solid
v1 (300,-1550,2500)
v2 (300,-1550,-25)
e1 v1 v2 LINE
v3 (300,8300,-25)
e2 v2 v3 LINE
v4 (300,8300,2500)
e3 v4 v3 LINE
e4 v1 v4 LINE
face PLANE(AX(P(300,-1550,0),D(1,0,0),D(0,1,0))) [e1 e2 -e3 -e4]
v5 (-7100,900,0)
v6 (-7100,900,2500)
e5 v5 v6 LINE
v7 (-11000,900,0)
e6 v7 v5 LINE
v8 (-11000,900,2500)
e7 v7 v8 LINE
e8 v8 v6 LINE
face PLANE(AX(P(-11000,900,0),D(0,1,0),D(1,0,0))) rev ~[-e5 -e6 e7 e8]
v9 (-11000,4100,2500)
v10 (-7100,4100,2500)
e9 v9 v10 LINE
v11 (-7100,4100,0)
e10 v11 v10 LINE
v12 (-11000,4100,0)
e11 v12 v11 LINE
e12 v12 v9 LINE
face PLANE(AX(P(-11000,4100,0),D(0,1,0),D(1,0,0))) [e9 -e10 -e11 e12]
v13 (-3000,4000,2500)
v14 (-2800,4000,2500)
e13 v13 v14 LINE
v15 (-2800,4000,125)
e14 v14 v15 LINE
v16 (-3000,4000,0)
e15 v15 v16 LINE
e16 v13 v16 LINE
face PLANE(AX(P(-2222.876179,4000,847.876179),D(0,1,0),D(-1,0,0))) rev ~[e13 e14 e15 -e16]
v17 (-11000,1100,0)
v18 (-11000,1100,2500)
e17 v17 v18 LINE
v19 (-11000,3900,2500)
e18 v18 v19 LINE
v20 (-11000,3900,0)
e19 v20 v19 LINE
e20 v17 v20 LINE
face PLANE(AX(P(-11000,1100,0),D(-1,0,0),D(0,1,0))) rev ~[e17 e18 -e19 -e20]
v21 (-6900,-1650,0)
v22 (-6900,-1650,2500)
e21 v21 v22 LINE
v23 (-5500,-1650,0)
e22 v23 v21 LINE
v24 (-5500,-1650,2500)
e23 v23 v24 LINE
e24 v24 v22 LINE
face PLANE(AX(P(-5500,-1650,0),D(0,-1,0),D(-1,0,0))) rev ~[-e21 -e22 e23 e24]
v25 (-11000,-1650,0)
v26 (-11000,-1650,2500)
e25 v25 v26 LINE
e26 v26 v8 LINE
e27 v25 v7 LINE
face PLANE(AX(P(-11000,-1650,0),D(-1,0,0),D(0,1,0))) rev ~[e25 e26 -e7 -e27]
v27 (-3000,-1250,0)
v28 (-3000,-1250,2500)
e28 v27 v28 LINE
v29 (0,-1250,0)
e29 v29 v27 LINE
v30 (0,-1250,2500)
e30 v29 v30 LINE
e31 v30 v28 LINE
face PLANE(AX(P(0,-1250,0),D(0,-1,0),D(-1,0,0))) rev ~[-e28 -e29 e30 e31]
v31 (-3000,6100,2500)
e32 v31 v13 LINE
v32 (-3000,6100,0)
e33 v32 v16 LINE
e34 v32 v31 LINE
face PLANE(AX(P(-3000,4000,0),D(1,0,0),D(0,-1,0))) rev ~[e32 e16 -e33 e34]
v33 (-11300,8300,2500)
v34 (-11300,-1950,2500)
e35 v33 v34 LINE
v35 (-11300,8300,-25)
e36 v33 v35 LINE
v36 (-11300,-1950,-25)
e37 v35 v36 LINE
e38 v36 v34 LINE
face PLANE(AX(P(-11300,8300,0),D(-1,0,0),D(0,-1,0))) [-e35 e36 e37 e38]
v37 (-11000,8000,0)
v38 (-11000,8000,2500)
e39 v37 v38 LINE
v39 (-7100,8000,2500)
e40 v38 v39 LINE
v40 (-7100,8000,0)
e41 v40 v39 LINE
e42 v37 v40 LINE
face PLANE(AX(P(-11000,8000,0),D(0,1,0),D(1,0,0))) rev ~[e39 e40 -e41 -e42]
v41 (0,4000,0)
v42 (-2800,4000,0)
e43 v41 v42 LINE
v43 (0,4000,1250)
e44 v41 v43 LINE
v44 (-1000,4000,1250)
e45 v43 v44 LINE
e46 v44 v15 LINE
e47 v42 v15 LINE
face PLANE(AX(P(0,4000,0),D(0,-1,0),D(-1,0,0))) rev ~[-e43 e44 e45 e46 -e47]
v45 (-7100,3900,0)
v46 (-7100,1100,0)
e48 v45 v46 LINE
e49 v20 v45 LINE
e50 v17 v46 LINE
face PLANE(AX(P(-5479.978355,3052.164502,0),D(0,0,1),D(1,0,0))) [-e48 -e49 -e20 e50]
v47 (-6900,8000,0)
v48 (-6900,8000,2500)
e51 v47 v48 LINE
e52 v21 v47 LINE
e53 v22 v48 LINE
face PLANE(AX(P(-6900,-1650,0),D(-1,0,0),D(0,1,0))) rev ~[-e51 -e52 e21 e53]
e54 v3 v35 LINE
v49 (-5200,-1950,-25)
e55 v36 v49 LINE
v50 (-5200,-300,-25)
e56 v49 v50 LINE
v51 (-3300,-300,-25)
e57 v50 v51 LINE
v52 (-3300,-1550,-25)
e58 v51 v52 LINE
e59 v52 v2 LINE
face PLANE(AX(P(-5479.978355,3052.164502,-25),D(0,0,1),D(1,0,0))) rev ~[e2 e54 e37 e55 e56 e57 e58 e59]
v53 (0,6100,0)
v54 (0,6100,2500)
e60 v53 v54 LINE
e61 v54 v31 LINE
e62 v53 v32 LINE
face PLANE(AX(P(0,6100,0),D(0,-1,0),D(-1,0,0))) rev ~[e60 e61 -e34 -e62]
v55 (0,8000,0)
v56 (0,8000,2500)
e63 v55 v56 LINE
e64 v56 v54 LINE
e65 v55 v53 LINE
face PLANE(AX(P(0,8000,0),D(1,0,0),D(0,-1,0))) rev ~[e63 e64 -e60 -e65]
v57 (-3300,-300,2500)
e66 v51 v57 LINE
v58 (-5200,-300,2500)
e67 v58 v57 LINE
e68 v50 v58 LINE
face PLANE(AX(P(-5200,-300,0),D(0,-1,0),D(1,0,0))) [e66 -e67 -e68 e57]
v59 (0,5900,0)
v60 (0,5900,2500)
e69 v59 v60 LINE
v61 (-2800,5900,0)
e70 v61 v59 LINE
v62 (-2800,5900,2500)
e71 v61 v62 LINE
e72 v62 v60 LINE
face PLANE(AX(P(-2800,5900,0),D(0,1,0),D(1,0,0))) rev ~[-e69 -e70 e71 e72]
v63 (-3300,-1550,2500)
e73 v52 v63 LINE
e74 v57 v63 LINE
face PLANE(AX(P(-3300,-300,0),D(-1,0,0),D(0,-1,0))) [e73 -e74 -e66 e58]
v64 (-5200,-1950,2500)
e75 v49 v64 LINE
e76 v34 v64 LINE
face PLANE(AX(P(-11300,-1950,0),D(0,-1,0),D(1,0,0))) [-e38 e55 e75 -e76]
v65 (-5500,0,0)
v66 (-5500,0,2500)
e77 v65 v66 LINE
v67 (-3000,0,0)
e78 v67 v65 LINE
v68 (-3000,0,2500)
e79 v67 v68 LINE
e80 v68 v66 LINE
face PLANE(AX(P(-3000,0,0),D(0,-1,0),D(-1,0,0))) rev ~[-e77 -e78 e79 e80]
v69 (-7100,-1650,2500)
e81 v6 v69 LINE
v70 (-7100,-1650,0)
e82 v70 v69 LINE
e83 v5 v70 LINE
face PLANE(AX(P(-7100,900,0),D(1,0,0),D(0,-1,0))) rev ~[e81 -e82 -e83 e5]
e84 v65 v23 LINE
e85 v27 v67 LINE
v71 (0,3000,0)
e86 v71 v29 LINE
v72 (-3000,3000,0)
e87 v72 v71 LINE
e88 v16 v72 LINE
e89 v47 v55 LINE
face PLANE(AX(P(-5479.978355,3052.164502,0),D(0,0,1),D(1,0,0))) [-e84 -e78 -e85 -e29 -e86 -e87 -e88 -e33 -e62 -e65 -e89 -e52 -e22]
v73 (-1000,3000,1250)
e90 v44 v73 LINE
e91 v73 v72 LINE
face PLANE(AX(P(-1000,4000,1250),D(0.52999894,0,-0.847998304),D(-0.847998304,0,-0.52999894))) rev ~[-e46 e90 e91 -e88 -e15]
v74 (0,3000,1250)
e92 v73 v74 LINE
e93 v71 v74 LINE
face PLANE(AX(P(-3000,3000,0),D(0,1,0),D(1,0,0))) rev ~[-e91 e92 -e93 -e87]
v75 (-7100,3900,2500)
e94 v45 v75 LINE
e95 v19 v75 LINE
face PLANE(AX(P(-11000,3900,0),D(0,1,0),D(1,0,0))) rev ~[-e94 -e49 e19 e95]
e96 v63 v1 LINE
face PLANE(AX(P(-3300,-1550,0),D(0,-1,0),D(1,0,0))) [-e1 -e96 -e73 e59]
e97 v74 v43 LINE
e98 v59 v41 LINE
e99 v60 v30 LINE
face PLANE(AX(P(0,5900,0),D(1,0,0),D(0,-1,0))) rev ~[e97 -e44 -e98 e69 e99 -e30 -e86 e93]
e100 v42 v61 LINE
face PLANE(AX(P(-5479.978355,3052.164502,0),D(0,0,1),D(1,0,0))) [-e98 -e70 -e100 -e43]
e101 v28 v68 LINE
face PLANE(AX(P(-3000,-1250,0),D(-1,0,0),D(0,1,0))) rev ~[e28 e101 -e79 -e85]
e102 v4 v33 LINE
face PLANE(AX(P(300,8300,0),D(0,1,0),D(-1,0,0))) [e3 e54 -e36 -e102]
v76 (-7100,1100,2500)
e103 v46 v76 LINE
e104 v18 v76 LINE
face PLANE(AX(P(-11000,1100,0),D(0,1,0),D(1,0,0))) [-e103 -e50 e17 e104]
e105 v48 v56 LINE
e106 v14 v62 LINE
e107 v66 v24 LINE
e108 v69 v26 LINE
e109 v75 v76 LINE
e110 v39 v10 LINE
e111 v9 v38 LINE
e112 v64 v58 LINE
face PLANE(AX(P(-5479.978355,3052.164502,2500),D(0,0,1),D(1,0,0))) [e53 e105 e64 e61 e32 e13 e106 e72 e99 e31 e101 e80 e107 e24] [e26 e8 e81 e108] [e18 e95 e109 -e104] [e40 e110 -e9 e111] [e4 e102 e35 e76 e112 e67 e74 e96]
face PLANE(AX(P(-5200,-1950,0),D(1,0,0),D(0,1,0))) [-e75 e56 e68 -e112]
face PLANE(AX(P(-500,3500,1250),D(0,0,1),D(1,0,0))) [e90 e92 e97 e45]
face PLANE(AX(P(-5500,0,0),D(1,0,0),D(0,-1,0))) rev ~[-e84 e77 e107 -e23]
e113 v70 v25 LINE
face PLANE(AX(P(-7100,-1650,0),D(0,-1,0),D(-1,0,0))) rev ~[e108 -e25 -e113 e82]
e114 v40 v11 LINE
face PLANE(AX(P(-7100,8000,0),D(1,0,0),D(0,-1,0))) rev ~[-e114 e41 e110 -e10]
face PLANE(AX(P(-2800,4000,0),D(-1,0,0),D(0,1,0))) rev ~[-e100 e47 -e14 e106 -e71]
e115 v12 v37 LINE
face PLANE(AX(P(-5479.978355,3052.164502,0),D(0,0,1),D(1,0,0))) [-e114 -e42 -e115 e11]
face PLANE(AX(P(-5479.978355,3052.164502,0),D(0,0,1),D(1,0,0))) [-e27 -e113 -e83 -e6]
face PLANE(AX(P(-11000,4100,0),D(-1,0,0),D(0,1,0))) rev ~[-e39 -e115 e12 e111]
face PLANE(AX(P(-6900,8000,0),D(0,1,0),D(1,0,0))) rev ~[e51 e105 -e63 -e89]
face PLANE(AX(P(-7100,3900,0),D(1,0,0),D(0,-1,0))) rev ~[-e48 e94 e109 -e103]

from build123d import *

# Parameters (mm, degrees)
F0_W        = 3900
F0_H        = 200
F1_DEPTH    = 2500
F0_H_2      = 3900
F0_H_3      = 2800
F2_DEPTH    = 25
F3_W        = 1000
F3_H        = 1000
F4_DEPTH    = 1250
F5_T4_DEPTH = 6170.686280177


# Not quite as in the source:
# - a fillet or chamfer that OpenCascade refuses, or shapes differently, is made with other operations: its cross-section is extruded or revolved along the edge and cut away or added


with BuildPart() as f1:
    # F0 (on Top) → F1 (new body)
    with BuildSketch(Plane.XY):
        Polygon((-11300, 8300), (-11300, 2877.939863491), (-11300, -1950), (-5200, -1950), (-5200, -300), (-3300, -300), (-3300, -1550), (300, -1550), (300, 2832.2768892759), (300, 8300), align=None)
        Polygon((-3000, -1250), (-3000, 0), (-5500, 0), (-5500, -1650), (-6900, -1650), (-7100, -1650), (-11000, -1650), (-11000, 0), (-11000, 900), (-11000, 1100), (-11000, 3900), (-11000, 4100), (-11000, 8000), (-7100, 8000), (-6900, 8000), (0, 8000), (0, 6100), (0, 5900), (0, 0), (0, -1250), align=None, mode=Mode.SUBTRACT)
        Polygon((-7100, -1650), (-6900, -1650), (-6900, 8000), (-7100, 8000), (-7100, 4100), (-7100, 3900), (-7100, 1100), (-7100, 900), align=None)
        with Locations((-9050, 4000)):
            Rectangle(F0_W, F0_H)
        with Locations((-9050, 1000)):
            Rectangle(F0_W, F0_H)
        Polygon((-2800, 5900), (0, 5900), (0, 6100), (-3000, 6100), (-3000, 4000), (-2800, 4000), align=None)
    extrude(amount=F1_DEPTH)

    # F0 (on Top) → F2 (join)
    with BuildSketch(Plane.XY):
        Polygon((-11300, 8300), (-11300, 2877.939863491), (-11300, -1950), (-5200, -1950), (-5200, -300), (-3300, -300), (-3300, -1550), (300, -1550), (300, 2832.2768892759), (300, 8300), align=None)
        Polygon((-3000, -1250), (-3000, 0), (-5500, 0), (-5500, -1650), (-6900, -1650), (-7100, -1650), (-11000, -1650), (-11000, 0), (-11000, 900), (-11000, 1100), (-11000, 3900), (-11000, 4100), (-11000, 8000), (-7100, 8000), (-6900, 8000), (0, 8000), (0, 6100), (0, 5900), (0, 0), (0, -1250), align=None, mode=Mode.SUBTRACT)
        with Locations((-9050, 1000)):
            Rectangle(F0_W, F0_H)
        with Locations((-9050, 4000)):
            Rectangle(F0_W, F0_H)
        Polygon((-7100, -1650), (-6900, -1650), (-6900, 8000), (-7100, 8000), (-7100, 4100), (-7100, 3900), (-7100, 1100), (-7100, 900), align=None)
        Polygon((-2800, 5900), (0, 5900), (0, 6100), (-3000, 6100), (-3000, 4000), (-2800, 4000), align=None)
        Polygon((-5500, 0), (-3000, 0), (-3000, -1250), (0, -1250), (0, 0), (0, 5900), (-2800, 5900), (-2800, 4000), (-3000, 4000), (-3000, 6100), (0, 6100), (0, 8000), (-6900, 8000), (-6900, -1650), (-5500, -1650), align=None)
        with Locations((-9050, 6050)):
            Rectangle(F0_W, F0_H_2)
        with Locations((-9050, 2500)):
            Rectangle(F0_W, F0_H_3)
        Polygon((-11000, -1650), (-7100, -1650), (-7100, 900), (-11000, 900), (-11000, 0), align=None)
    extrude(amount=-F2_DEPTH)

    # F3 (on face) → F4 (join)
    with BuildSketch(Plane.XY):
        with Locations((-500, 3500)):
            Rectangle(F3_W, F3_H)
        Polygon((-3000, 3000), (-1000, 3000), (-1000, 4000), (-2800, 4000), (-3000, 4000), align=None)
    extrude(amount=F4_DEPTH)

    # F5: chamfer of 1250 x 2000 on 1 edges, made by hand


with BuildPart() as f5_tool2:
    # F5_s3 → F5_t4 (new body)
    with BuildSketch(Plane.XZ.offset(-4000)):
        Polygon((-1000, 1250), (-3000, 0), (-3000, 1250), align=None)
    extrude(amount=F5_T4_DEPTH)

    split(bisect_by=Plane.XZ, keep=Keep.BOTTOM)


with BuildPart() as f1_1:
    add(f1.part)

    # F5_t1: cut F5_tool2
    add(f5_tool2.part, mode=Mode.SUBTRACT)


solid = f1_1.part
